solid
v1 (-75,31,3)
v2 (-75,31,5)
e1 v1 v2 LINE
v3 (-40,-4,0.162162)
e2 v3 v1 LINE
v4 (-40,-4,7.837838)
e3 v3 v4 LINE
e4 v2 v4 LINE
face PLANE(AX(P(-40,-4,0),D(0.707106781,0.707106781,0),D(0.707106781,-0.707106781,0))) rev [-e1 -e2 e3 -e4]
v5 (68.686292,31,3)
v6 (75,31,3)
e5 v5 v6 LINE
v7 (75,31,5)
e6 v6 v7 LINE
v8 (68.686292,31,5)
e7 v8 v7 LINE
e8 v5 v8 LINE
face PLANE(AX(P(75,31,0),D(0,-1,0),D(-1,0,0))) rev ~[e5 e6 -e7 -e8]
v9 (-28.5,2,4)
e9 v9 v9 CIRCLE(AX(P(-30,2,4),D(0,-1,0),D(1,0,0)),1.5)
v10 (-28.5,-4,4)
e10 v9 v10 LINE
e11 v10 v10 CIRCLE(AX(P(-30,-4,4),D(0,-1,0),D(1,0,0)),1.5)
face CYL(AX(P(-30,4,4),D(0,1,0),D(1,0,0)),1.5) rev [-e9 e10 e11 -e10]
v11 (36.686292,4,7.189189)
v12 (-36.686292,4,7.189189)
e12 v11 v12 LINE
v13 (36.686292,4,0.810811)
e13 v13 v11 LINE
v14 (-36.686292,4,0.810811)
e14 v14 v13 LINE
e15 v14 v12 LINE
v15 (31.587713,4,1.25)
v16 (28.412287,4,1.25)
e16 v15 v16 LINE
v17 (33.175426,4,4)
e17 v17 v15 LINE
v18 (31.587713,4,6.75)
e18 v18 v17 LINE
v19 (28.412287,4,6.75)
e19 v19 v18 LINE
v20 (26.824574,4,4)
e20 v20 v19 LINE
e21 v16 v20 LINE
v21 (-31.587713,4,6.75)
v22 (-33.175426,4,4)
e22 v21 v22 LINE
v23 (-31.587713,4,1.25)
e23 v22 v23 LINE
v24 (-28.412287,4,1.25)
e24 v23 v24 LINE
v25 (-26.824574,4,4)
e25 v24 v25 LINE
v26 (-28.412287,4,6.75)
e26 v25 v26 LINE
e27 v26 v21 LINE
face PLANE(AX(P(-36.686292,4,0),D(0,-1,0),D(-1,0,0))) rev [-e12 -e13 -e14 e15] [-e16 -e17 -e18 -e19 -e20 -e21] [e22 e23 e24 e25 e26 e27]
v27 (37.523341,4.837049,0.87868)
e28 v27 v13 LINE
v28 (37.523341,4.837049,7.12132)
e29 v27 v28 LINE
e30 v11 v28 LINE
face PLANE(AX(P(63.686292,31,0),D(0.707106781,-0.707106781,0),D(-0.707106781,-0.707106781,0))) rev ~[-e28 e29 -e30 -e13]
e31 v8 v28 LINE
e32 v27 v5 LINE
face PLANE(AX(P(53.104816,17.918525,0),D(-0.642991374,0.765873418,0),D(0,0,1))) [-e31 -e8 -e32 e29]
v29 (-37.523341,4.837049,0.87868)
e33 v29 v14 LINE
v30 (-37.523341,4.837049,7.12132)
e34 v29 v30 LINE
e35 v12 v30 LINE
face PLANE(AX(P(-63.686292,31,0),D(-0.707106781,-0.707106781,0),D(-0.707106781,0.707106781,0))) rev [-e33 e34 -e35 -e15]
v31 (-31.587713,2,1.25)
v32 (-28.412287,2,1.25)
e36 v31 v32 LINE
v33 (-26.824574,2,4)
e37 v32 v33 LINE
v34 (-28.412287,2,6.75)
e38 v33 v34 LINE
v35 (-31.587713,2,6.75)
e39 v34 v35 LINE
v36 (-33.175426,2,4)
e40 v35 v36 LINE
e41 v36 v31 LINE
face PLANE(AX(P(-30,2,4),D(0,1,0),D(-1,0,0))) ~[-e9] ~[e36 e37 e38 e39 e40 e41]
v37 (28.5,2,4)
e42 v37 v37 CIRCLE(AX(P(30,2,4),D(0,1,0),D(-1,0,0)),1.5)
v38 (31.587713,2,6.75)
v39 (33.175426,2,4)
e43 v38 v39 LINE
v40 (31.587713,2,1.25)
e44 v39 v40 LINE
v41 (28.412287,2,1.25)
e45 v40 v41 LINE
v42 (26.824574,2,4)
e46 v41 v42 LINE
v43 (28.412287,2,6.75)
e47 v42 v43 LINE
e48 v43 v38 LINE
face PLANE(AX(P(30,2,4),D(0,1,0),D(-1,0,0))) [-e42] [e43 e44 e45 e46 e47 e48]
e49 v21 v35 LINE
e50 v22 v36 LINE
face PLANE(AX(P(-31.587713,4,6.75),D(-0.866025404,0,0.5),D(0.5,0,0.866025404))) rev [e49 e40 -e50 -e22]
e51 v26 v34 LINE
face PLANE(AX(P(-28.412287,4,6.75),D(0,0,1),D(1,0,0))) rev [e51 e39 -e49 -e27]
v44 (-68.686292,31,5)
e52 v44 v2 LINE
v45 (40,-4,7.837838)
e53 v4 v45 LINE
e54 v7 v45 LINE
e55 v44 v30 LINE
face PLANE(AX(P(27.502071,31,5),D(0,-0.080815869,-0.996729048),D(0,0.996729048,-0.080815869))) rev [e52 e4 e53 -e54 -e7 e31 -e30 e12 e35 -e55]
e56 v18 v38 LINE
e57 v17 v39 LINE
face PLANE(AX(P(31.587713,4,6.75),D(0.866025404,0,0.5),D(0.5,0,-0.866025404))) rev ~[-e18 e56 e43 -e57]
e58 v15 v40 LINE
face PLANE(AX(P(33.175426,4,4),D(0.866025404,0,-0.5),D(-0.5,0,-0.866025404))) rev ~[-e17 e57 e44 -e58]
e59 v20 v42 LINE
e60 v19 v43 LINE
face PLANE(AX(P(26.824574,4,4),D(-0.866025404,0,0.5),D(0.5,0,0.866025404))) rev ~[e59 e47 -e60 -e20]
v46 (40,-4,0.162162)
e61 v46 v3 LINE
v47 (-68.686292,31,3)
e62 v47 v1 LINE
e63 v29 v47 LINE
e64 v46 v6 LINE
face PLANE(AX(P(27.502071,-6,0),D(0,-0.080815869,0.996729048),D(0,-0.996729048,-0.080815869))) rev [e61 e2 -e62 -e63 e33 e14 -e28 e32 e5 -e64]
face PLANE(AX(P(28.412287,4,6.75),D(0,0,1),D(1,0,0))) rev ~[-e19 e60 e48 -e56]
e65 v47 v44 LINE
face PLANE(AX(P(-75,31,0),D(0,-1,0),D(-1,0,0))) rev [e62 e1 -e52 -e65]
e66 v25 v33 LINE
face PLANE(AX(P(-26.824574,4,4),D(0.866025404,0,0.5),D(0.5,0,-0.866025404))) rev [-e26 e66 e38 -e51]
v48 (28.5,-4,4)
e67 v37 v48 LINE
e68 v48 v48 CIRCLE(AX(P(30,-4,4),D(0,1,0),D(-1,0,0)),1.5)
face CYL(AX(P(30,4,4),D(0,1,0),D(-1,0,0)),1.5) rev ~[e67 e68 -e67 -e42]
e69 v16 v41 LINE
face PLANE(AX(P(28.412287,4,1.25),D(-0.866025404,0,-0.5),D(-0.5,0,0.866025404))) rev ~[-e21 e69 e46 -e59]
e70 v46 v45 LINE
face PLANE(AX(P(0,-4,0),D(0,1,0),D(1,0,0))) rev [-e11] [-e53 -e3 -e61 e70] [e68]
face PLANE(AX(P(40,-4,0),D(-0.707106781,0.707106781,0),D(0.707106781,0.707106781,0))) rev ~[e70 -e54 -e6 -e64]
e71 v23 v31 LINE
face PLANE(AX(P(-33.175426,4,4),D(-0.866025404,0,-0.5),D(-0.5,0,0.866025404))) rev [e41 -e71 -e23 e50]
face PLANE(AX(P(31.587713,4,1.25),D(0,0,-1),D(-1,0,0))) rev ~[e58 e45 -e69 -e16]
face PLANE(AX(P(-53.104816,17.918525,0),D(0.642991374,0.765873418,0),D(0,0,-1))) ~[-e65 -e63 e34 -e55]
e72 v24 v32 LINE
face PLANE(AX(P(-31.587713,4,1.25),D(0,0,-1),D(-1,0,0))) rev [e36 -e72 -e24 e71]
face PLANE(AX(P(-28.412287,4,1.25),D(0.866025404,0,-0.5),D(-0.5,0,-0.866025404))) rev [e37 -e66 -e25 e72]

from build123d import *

# Parameters (mm, degrees)
F1_DEPTH    = 8
F2_R        = 1.5
F3_DEPTH    = 8
F4_DEPTH    = 2
F5_SIZE2    = 5
F5_SIZE     = 37
F6_T1_DEPTH = 198.6904330104


# Not quite as in the source:
# - a fillet or chamfer that OpenCascade refuses, or shapes differently, is made with other operations: its cross-section is extruded or revolved along the edge and cut away or added


with BuildPart() as f1:
    # F0 (on Top) → F1 (new body)
    with BuildSketch(Plane.XY):
        Polygon((0, -4), (40, -4), (75, 31), (63.686291501, 31), (36.686291501, 4), (0, 4), align=None)
    extrude(amount=F1_DEPTH)

    # F2 (on face) → F3 (cut, through all)
    with BuildSketch(Plane(origin=(0, 4, 0), x_dir=(-1, 0, 0), z_dir=(0, 1, 0))):
        with Locations((-30, 4)):
            Circle(F2_R)
    extrude(amount=-F3_DEPTH, mode=Mode.SUBTRACT)

    # F2 (on face) → F4 (cut)
    with BuildSketch(Plane(origin=(0, 4, 0), x_dir=(-1, 0, 0), z_dir=(0, 1, 0))):
        Polygon((-28.4122867597, 1.25), (-26.8245735195, 4), (-28.4122867597, 6.75), (-31.5877132403, 6.75), (-33.1754264805, 4), (-31.5877132403, 1.25), align=None)
        with Locations((-30, 4)):
            Circle(F2_R, mode=Mode.SUBTRACT)
    extrude(amount=-F4_DEPTH, mode=Mode.SUBTRACT)

    # F5
    f5_edges = [f1.edges().sort_by_distance(p)[0] for p in [
        (63.686292, 31, 4),
    ]]
    f5_side = f1.faces().sort_by_distance((50.186292, 17.5, 4))[0]
    chamfer(f5_edges, length=F5_SIZE, length2=F5_SIZE2, reference=f5_side)

    # F6: chamfer of 37 x 3 on 2 edges, made by hand

    # F6_s2 → F6_t1 (cut)
    with BuildSketch(Plane.YZ.offset(-27.5020707547)):
        Polygon((-6, 0), (31, 3), (31, 0), align=None)
        Polygon((31, 5), (-6, 8), (31, 8), align=None)
    extrude(amount=F6_T1_DEPTH, mode=Mode.SUBTRACT)

    # F7: F1 across plane


with BuildPart() as f1_1:
    add(f1.part)
    add(f1.part.mirror(Plane.YZ))


solid = f1_1.part
